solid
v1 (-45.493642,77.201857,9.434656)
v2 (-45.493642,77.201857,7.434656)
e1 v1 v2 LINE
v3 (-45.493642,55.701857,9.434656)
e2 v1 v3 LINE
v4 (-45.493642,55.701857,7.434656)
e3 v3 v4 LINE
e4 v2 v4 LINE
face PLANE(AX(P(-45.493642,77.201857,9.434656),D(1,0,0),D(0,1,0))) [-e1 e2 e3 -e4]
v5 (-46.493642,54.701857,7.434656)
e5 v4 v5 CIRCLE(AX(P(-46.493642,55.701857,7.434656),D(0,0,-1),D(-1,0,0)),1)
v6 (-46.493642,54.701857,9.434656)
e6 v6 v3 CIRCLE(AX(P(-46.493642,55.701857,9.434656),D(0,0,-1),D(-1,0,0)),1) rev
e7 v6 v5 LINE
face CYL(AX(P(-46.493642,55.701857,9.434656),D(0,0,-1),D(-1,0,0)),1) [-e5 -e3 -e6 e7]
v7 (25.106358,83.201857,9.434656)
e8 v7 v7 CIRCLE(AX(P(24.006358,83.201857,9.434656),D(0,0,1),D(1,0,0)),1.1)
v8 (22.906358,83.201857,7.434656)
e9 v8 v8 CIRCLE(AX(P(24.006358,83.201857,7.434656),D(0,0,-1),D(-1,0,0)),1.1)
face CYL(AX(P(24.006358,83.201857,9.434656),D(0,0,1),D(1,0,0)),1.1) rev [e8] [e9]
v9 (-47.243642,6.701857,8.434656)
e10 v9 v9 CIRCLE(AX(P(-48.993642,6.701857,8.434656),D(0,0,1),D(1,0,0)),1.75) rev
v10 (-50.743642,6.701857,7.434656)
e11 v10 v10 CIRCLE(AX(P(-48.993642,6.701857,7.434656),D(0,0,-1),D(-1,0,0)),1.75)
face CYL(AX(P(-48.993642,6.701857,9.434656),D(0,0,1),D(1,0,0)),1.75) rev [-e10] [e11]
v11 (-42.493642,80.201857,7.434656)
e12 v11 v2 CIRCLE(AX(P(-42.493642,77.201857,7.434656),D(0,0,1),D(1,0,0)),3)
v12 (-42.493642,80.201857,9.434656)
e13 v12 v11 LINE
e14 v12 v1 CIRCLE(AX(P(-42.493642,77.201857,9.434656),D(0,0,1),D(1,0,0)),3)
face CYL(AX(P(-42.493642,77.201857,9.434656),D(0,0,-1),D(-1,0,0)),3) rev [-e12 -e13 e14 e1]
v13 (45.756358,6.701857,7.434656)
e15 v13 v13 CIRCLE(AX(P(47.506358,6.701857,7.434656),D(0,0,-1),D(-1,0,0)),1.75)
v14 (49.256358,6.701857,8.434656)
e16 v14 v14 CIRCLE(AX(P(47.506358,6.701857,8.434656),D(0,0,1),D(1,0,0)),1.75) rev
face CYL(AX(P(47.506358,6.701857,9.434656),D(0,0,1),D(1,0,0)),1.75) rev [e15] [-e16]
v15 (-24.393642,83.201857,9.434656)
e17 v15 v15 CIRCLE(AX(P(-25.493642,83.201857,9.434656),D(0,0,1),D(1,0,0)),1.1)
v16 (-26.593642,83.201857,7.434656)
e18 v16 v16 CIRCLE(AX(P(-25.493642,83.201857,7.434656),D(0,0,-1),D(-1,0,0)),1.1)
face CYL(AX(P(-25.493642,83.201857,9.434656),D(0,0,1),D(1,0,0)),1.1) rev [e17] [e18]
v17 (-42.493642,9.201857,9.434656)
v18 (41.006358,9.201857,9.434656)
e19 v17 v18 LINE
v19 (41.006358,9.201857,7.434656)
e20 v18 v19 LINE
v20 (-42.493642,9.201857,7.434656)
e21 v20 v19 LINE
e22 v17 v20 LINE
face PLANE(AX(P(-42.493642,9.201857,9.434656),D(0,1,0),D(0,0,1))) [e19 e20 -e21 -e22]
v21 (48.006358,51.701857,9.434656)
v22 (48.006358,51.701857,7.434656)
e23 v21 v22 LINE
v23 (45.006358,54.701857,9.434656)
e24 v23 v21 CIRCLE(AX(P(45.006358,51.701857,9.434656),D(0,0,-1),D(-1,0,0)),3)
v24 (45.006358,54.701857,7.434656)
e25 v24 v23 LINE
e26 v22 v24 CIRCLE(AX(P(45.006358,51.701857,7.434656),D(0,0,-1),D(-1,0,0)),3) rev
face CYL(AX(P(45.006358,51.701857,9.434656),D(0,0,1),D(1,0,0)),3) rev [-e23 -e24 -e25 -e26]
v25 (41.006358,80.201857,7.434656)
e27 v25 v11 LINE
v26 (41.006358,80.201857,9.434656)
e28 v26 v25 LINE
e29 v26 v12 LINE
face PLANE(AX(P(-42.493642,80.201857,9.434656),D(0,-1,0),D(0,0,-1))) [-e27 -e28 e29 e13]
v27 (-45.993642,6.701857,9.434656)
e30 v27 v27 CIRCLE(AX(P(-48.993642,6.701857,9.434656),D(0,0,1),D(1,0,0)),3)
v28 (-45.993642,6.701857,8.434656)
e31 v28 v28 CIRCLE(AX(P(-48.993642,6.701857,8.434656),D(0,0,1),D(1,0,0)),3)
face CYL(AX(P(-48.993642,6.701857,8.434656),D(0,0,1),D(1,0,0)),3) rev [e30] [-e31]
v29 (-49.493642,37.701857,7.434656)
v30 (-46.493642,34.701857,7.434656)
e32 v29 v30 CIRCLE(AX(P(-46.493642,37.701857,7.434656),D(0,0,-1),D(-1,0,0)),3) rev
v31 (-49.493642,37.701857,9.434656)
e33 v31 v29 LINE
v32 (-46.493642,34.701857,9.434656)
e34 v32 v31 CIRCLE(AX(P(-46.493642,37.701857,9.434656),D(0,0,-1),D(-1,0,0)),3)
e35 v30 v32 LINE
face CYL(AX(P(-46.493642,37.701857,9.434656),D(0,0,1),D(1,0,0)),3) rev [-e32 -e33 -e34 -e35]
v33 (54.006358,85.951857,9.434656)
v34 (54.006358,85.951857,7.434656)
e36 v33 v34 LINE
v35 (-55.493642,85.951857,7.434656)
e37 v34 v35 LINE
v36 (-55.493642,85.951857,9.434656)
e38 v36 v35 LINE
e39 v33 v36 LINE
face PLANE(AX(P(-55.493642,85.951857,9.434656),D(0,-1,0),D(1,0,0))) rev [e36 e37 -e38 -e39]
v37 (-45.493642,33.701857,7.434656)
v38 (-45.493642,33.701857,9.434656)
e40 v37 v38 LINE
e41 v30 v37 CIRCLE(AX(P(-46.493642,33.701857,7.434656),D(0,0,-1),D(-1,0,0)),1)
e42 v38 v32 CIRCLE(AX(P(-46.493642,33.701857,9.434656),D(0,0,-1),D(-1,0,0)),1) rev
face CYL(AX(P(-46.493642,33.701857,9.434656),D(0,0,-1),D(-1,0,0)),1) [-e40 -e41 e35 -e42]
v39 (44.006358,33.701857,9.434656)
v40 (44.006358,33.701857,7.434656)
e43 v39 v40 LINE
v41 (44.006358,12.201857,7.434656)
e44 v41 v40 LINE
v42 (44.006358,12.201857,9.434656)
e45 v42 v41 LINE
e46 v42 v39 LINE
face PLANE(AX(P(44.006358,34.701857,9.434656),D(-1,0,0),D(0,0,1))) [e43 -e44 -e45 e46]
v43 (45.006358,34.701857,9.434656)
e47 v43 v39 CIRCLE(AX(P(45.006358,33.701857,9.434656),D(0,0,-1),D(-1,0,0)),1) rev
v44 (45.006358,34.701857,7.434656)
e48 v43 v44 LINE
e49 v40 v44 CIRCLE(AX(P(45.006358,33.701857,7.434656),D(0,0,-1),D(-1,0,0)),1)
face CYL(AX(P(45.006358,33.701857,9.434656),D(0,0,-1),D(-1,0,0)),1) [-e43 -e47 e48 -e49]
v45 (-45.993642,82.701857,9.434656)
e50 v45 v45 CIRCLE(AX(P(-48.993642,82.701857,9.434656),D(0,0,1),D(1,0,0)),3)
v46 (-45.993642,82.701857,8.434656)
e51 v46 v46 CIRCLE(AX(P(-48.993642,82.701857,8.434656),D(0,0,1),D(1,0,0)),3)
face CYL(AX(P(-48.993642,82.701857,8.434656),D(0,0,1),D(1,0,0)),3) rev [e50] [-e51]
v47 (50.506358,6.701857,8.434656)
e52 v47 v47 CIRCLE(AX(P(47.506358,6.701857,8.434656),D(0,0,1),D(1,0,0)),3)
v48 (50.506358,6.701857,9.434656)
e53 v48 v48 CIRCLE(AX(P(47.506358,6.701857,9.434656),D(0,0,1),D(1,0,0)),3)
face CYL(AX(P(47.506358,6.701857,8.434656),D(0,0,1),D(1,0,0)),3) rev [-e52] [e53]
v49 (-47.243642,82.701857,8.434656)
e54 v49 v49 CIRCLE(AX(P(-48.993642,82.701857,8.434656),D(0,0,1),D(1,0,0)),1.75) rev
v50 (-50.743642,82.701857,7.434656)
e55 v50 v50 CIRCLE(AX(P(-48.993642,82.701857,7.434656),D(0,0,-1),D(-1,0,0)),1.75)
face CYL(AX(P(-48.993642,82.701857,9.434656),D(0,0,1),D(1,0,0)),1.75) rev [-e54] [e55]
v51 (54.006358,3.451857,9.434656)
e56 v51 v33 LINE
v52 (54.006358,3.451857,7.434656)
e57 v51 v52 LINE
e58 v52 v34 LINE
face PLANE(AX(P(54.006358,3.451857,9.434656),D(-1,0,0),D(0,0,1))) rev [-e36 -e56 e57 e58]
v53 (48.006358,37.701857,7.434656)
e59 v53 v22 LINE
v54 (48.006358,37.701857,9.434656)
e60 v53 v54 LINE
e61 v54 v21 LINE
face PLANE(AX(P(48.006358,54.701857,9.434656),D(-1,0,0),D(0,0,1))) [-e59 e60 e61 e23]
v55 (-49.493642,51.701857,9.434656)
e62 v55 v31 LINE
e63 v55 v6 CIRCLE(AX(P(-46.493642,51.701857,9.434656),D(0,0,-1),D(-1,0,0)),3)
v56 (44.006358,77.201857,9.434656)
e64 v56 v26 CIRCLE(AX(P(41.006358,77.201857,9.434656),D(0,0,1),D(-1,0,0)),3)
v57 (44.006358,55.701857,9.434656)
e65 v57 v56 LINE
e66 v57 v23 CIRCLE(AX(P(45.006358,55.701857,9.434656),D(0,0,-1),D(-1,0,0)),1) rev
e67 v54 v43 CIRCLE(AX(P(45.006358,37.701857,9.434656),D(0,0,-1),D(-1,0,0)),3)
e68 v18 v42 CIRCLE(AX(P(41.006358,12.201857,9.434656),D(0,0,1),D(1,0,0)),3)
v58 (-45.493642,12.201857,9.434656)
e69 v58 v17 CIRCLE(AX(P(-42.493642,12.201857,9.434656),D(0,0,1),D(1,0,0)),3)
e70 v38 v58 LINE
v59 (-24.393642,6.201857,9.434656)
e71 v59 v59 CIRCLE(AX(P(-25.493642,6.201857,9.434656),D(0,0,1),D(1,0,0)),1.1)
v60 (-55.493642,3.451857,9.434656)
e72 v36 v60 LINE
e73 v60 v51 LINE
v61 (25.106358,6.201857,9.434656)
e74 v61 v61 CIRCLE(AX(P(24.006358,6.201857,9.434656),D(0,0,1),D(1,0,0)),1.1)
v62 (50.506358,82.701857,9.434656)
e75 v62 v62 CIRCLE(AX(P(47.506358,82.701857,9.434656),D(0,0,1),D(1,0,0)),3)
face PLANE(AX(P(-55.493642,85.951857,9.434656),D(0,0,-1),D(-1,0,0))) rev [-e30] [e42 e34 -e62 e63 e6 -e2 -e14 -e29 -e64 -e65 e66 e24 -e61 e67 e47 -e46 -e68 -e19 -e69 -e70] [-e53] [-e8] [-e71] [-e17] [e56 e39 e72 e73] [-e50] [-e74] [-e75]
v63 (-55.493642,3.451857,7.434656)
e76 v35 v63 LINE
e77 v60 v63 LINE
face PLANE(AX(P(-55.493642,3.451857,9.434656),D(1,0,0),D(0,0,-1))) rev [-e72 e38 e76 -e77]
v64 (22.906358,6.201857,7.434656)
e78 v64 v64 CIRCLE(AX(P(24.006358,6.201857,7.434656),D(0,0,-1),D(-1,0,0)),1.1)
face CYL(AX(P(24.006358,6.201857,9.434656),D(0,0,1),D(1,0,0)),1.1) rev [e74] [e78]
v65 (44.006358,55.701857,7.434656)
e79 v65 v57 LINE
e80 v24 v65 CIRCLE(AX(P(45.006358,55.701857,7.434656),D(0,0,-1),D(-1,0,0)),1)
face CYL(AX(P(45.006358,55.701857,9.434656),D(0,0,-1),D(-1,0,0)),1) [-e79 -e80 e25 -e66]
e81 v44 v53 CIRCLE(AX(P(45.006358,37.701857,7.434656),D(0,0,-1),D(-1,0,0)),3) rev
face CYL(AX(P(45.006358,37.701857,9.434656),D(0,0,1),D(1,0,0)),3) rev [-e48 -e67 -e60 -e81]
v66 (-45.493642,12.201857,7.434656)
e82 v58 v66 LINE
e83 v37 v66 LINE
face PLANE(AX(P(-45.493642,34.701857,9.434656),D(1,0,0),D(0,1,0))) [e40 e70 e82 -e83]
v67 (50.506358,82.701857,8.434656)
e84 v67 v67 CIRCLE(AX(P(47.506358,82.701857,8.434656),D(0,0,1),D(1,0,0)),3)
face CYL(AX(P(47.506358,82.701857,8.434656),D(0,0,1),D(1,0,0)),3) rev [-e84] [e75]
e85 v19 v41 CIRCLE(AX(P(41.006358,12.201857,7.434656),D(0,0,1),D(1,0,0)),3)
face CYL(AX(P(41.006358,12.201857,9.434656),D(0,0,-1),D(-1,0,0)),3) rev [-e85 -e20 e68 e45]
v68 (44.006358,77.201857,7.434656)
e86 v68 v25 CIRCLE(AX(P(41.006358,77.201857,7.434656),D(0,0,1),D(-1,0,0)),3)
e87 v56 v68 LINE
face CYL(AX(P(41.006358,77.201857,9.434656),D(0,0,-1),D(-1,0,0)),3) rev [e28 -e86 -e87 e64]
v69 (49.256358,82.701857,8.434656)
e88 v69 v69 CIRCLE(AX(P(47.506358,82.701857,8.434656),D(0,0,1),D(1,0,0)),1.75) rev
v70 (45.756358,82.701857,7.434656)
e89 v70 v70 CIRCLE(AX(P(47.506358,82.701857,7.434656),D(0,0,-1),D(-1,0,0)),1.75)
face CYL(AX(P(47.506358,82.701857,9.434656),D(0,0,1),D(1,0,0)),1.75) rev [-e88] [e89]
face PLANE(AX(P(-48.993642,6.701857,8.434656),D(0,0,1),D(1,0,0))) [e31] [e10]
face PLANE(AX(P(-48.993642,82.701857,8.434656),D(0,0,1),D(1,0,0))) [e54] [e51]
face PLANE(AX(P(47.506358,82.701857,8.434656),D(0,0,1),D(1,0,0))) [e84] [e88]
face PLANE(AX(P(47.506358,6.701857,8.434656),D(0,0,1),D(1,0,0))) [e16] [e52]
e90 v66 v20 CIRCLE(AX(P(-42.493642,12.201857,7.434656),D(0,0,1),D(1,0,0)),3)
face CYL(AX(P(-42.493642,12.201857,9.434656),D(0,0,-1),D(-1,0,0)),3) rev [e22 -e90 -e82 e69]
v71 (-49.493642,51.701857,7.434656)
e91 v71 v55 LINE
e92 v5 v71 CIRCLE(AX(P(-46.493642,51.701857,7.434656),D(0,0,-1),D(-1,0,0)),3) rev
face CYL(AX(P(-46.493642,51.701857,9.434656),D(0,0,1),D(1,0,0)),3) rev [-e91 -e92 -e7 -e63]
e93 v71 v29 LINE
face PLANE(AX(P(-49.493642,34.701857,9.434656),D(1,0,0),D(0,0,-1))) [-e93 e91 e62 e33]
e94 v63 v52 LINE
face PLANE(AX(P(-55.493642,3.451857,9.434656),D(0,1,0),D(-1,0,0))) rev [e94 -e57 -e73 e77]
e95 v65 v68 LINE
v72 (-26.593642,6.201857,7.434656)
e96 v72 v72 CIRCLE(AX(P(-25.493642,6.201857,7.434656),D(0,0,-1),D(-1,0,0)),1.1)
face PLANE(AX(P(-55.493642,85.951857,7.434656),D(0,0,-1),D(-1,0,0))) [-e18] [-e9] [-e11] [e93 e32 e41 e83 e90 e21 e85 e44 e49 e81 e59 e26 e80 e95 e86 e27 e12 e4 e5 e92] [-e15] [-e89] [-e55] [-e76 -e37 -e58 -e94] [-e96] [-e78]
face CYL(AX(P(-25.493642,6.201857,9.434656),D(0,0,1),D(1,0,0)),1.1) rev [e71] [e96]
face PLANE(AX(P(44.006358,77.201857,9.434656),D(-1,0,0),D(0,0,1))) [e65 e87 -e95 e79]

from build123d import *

# Parameters (mm, degrees)
SKETCH1_W                  = 109.5
SKETCH1_H                  = 82.5
BOSS_EXTRUDE1_DEPTH        = 2
F_3_5_3_5_DIAMETER_HOLE1_D = 3.5
F_2_2_2_2_DIAMETER_HOLE1_D = 2.2
SKETCH12_R                 = 3
CUT_EXTRUDE1_DEPTH         = 1
FILLET1_R                  = 3
FILLET2_R                  = 1


with BuildPart() as part:
    # Sketch1 → Boss-Extrude1 (new body)
    with BuildSketch(Plane.XY.offset(7.43465612)):
        with Locations((-0.743641502, 44.70185693)):
            Rectangle(SKETCH1_W, SKETCH1_H)
        with BuildLine():
            Line((-45.493641502, 34.70185693), (-49.493641502, 34.70185693))
            Line((-49.493641502, 34.70185693), (-49.493641502, 54.70185693))
            Line((-49.493641502, 54.70185693), (-45.493641502, 54.70185693))
            Line((-45.493641502, 54.70185693), (-45.493641502, 77.20185693))
            ThreePointArc((-45.493641502, 77.20185693), (-44.614961845, 79.323177274), (-42.493641502, 80.20185693))
            Line((-42.493641502, 80.20185693), (41.006358498, 80.20185693))
            ThreePointArc((41.006358498, 80.20185693), (43.127678842, 79.323177274), (44.006358498, 77.20185693))
            Line((44.006358498, 77.20185693), (44.006358498, 54.70185693))
            Line((44.006358498, 54.70185693), (48.006358498, 54.70185693))
            Line((48.006358498, 54.70185693), (48.006358498, 44.70185693))
            Line((48.006358498, 44.70185693), (48.006358498, 34.70185693))
            Line((48.006358498, 34.70185693), (44.006358498, 34.70185693))
            Line((44.006358498, 34.70185693), (44.006358498, 12.20185693))
            ThreePointArc((44.006358498, 12.20185693), (43.127678842, 10.080536587), (41.006358498, 9.20185693))
            Line((41.006358498, 9.20185693), (-42.493641502, 9.20185693))
            ThreePointArc((-42.493641502, 9.20185693), (-44.614961845, 10.080536587), (-45.493641502, 12.20185693))
            Line((-45.493641502, 12.20185693), (-45.493641502, 34.70185693))
        make_face(mode=Mode.SUBTRACT)
    extrude(amount=BOSS_EXTRUDE1_DEPTH)

    # Ø3.5 (3.5) Diameter Hole1 (through all)
    with Locations(Plane.XY.offset(9.43465612)):
        with Locations((-48.993641502, 6.70185693), (-48.993641502, 82.70185693), (47.506358498, 82.70185693), (47.506358498, 6.70185693)):
            Hole(F_3_5_3_5_DIAMETER_HOLE1_D / 2)

    # Ø2.2 (2.2) Diameter Hole1 (through all)
    with Locations(Plane(origin=(-25.493641502, 83.20185693, 9.43465612), x_dir=(1, 0, 0), z_dir=(0, 0, 1))):
        with Locations((0, 0), (49.5, 0), (49.5, -77), (0, -77)):
            Hole(F_2_2_2_2_DIAMETER_HOLE1_D / 2)

    # Sketch12 → Cut-Extrude1 (cut)
    with BuildSketch(Plane.XY.offset(9.43465612)):
        with Locations((-48.993641502, 82.70185693)):
            Circle(SKETCH12_R)
        with Locations((47.506358498, 82.70185693)):
            Circle(SKETCH12_R)
        with Locations((47.506358498, 6.70185693)):
            Circle(SKETCH12_R)
        with Locations((-48.993641502, 6.70185693)):
            Circle(SKETCH12_R)
    extrude(amount=-CUT_EXTRUDE1_DEPTH, mode=Mode.SUBTRACT)

    # Fillet1
    fillet1_edges = [part.edges().sort_by_distance(p)[0] for p in [
        (48.006358498, 34.70185693, 8.43465612),
        (48.006358498, 54.70185693, 8.43465612),
        (-49.493641502, 54.70185693, 8.43465612),
        (-49.493641502, 34.70185693, 8.43465612),
    ]]
    fillet(fillet1_edges, radius=FILLET1_R)

    # Fillet2
    fillet2_edges = [part.edges().sort_by_distance(p)[0] for p in [
        (44.006358498, 34.70185693, 8.43465612),
        (44.006358498, 54.70185693, 8.43465612),
        (-45.493641502, 34.70185693, 8.43465612),
        (-45.493641502, 54.70185693, 8.43465612),
    ]]
    fillet(fillet2_edges, radius=FILLET2_R - 0.0001)  # a hair under: the kernel refuses the full size


solid = part.part
